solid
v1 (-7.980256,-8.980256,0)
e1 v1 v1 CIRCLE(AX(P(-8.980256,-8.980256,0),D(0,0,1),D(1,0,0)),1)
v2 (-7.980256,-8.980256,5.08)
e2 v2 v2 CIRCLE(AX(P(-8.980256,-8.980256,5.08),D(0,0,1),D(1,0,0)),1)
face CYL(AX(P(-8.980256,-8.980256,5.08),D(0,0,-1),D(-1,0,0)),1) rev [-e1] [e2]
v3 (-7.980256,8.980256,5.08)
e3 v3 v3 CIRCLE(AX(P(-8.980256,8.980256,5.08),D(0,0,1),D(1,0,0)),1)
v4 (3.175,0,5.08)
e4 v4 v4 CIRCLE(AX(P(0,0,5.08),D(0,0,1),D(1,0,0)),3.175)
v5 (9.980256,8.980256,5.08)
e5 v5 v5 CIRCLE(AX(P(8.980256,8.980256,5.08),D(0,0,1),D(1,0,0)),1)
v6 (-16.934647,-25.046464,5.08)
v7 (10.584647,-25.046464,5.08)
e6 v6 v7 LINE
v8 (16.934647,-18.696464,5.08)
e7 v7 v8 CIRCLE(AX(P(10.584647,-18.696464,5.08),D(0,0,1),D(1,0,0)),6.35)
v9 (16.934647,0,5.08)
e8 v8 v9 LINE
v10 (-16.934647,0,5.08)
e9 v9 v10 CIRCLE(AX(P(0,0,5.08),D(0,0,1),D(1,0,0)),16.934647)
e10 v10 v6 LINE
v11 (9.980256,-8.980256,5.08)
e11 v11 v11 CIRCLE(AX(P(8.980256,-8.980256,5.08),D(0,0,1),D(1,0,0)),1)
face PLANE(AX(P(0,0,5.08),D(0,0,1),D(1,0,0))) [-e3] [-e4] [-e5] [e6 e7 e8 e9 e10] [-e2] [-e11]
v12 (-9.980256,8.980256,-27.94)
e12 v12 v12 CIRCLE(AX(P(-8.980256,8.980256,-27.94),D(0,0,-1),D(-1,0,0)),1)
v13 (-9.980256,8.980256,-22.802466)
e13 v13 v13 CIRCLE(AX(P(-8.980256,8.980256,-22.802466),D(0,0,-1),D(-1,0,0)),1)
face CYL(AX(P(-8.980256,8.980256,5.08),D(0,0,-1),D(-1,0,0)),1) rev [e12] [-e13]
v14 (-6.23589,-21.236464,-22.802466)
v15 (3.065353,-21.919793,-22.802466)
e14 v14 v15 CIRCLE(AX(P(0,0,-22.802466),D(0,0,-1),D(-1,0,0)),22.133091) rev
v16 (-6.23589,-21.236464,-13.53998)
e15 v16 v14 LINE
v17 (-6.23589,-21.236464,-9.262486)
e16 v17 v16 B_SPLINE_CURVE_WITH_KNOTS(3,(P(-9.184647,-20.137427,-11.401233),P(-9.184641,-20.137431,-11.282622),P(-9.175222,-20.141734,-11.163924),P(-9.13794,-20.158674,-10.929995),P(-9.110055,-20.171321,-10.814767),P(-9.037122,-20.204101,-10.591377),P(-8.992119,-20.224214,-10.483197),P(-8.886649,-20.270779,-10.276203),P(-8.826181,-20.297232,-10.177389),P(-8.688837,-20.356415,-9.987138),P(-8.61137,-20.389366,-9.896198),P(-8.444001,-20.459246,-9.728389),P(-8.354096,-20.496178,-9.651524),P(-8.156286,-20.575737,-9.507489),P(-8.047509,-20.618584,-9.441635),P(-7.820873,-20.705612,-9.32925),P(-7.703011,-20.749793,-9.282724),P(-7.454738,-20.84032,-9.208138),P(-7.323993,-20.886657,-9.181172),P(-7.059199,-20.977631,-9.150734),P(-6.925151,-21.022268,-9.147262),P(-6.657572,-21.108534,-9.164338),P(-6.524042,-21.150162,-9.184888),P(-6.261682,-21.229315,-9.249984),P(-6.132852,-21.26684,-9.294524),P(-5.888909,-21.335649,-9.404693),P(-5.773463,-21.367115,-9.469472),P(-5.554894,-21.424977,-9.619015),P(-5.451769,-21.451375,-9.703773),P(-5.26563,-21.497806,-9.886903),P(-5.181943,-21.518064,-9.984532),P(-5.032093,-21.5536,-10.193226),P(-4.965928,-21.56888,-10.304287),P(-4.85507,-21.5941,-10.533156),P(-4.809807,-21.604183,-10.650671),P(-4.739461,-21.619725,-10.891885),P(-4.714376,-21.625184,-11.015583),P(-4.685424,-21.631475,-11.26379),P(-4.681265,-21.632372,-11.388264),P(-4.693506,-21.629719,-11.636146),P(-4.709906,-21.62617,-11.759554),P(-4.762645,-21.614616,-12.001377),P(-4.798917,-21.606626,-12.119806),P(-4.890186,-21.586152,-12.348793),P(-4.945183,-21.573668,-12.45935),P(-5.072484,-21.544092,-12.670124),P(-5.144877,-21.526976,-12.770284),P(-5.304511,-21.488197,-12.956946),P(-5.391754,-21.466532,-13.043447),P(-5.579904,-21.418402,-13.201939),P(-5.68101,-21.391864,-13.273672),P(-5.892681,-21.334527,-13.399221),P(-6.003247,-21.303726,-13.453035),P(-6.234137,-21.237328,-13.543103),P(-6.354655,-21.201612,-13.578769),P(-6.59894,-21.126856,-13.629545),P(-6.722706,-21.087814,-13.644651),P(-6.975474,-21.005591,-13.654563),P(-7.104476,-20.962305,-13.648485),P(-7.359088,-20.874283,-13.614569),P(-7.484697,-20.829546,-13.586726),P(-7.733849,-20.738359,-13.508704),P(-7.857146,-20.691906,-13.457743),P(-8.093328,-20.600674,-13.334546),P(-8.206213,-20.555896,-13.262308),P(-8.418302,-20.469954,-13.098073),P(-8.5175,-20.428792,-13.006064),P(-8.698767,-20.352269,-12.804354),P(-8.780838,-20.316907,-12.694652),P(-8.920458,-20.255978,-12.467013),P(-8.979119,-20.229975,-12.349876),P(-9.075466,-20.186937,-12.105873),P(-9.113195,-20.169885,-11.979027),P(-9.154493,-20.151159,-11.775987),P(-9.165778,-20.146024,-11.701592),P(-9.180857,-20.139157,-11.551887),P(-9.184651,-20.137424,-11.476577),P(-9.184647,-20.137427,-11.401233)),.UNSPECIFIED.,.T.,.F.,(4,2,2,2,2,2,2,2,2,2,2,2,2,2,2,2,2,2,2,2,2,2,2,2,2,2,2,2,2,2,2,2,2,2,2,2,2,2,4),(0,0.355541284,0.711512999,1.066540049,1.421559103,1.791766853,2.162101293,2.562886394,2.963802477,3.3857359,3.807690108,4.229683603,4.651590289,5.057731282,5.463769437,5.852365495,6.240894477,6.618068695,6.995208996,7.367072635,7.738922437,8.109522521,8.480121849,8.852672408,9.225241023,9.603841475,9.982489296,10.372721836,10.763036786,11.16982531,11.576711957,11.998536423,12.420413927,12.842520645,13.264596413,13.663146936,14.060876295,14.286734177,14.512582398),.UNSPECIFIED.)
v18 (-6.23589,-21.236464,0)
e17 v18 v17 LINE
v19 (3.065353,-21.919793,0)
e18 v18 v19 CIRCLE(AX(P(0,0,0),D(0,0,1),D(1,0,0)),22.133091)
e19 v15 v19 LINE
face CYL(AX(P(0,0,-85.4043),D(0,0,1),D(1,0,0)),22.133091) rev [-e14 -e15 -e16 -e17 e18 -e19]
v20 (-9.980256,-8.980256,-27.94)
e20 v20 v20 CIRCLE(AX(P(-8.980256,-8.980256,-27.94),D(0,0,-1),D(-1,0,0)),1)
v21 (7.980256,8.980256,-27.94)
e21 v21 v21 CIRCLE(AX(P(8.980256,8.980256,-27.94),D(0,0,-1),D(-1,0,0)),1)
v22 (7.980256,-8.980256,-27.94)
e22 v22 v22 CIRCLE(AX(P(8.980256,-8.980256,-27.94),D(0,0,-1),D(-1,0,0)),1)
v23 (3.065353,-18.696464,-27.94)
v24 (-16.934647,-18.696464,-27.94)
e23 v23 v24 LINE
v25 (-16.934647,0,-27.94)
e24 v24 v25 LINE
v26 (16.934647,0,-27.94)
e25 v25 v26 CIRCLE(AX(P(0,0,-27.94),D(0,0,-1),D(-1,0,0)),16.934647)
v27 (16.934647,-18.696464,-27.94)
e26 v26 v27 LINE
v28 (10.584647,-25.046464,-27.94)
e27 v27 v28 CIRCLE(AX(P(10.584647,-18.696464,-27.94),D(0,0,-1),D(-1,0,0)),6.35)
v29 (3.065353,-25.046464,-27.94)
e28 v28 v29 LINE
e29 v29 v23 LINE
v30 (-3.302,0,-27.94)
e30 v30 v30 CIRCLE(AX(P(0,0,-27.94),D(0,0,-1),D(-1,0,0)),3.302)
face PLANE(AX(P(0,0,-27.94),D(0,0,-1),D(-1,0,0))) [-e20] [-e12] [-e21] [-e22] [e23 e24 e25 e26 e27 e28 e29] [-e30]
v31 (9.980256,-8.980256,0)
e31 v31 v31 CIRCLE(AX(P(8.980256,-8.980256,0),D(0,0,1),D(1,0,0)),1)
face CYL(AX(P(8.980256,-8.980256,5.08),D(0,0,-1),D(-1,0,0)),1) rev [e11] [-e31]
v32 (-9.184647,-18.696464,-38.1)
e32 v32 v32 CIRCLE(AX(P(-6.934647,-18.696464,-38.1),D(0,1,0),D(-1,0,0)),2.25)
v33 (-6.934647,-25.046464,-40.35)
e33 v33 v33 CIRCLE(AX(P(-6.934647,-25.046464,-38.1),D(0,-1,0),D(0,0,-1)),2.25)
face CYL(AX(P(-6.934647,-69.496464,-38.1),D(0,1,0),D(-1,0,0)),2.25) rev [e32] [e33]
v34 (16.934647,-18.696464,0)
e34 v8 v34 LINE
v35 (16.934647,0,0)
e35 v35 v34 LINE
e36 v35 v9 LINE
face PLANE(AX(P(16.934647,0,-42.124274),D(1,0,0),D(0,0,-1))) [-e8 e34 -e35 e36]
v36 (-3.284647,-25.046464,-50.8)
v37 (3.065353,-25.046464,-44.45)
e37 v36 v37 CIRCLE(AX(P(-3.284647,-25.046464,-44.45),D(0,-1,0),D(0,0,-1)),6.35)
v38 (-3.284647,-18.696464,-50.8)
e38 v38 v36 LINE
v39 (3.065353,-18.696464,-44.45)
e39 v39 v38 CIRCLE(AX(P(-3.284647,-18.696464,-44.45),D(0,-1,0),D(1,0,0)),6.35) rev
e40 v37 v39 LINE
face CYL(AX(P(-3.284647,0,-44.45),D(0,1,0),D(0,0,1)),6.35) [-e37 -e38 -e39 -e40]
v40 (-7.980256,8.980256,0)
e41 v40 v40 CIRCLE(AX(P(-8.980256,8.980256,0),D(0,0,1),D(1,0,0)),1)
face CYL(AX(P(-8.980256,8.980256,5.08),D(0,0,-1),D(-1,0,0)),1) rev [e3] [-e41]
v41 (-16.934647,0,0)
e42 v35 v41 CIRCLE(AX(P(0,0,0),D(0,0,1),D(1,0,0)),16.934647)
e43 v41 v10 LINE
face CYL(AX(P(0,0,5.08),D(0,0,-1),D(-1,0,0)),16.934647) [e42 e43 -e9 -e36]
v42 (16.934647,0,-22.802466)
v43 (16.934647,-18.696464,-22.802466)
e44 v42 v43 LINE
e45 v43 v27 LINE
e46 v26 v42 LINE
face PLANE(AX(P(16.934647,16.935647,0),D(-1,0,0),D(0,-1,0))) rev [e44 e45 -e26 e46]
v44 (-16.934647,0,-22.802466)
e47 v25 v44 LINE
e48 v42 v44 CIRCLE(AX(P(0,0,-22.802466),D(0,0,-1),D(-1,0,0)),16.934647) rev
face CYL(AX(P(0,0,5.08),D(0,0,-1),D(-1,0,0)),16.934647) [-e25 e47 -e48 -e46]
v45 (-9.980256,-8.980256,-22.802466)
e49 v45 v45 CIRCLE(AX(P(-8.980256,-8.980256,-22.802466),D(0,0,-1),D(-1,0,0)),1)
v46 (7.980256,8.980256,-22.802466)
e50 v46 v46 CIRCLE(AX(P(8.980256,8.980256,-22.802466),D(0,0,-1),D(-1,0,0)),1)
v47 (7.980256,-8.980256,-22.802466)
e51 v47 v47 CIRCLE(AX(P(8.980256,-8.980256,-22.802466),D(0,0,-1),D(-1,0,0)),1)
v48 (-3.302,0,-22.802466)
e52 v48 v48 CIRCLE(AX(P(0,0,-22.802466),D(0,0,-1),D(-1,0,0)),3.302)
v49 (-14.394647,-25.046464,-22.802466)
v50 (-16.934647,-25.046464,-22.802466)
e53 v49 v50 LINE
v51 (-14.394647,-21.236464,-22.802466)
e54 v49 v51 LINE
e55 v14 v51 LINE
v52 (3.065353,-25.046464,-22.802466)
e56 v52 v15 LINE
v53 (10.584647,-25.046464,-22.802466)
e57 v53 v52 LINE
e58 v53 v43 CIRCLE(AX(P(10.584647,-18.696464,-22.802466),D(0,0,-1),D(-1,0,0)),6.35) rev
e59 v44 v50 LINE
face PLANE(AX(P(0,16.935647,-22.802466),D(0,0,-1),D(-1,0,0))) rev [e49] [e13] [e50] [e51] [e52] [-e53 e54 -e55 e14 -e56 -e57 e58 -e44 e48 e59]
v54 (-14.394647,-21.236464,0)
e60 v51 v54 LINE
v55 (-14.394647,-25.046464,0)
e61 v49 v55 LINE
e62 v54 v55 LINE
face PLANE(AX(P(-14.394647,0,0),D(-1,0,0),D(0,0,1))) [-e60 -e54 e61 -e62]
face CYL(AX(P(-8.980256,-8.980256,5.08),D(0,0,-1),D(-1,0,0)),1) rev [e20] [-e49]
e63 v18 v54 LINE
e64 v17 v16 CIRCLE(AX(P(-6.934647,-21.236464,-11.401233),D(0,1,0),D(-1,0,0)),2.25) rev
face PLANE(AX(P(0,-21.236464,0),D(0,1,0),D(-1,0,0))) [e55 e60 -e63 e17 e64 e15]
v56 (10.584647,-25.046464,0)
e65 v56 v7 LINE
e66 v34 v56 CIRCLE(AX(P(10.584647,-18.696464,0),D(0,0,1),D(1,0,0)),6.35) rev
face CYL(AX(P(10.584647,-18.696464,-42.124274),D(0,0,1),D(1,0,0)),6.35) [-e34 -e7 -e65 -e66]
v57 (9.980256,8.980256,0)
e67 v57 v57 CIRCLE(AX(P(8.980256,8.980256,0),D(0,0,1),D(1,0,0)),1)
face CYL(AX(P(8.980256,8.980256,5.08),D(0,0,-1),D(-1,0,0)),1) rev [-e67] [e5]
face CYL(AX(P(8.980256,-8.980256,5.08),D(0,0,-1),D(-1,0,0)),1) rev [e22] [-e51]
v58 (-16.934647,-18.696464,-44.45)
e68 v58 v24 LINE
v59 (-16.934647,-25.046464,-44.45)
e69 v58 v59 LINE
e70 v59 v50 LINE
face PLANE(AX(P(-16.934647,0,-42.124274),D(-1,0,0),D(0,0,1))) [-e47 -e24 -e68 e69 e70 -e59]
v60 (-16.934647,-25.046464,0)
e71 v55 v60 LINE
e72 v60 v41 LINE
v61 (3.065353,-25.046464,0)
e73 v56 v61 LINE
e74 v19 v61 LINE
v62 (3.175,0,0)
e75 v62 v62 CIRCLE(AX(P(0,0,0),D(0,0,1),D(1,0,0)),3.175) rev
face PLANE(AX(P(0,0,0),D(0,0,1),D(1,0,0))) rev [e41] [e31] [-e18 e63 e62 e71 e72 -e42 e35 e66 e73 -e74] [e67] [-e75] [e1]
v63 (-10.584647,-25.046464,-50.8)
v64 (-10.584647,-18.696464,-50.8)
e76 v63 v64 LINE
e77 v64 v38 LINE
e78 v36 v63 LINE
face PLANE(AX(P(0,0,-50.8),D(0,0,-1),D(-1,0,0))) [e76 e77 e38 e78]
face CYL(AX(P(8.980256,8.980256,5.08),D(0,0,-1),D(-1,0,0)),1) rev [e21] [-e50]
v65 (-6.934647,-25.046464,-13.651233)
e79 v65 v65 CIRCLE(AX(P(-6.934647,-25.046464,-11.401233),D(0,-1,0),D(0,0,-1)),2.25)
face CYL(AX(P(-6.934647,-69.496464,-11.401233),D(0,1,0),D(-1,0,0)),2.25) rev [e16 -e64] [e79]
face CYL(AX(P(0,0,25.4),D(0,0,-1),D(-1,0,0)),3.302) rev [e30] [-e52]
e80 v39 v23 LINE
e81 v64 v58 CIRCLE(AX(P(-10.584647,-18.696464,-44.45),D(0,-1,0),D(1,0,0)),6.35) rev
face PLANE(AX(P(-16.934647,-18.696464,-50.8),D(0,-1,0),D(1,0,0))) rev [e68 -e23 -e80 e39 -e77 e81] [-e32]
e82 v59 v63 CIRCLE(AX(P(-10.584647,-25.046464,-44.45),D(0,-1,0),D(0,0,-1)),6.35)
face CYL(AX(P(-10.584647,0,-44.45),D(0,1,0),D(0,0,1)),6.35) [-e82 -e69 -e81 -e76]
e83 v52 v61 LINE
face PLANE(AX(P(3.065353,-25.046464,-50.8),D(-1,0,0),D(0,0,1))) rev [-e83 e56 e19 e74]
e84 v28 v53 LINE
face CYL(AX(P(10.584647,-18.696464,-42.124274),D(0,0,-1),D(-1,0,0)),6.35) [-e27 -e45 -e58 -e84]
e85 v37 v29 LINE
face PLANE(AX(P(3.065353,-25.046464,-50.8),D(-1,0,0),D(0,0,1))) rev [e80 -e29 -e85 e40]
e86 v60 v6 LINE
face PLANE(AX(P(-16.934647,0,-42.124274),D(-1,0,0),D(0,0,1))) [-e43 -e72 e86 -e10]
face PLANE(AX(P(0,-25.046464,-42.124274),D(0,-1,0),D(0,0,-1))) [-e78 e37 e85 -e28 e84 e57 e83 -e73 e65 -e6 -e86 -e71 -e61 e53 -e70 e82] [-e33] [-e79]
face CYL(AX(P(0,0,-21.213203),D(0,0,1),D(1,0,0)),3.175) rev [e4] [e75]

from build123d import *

# Parameters (mm, degrees)
SKETCH1_R                      = 16.934647101
SKETCH1_R_2                    = 1
SKETCH1_R_3                    = 7.5
BOSS_EXTRUDE1_DEPTH            = 5.08
BOSS_EXTRUDE2_START            = -5.08
BOSS_EXTRUDE2_DEPTH            = 5.08
SKETCH3_W                      = 20
SKETCH3_H                      = 6.35
BOSS_EXTRUDE3_DEPTH            = 50.8
BOSS_EXTRUDE4_START            = -25.4
BOSS_EXTRUDE4_DEPTH            = 2.597534174
SKETCH5_R                      = 3.302
CUT_EXTRUDE1_DEPTH             = 50.8
SKETCH6_W                      = 13.869294202
SKETCH6_H                      = 2.597534174
BOSS_EXTRUDE5_DEPTH            = 6.35
CUT_EXTRUDE2_DEPTH             = 50.8
BOSS_EXTRUDE7_START            = 2.54
SKETCH8_R                      = 3.302
BOSS_EXTRUDE7_DEPTH            = 2.54
CUT_EXTRUDE3_REACH             = 55.758
SKETCH10_R                     = 22.133090672
CUT_EXTRUDE3_DIRECTION_2_REACH = 55.758
FILLET1_R                      = 6.35
FILLET3_R                      = 6.35
SKETCH11_R                     = 1
CUT_EXTRUDE4_DEPTH             = 45.770838885
BOSS_EXTRUDE8_START            = -5.08
SKETCH12_R                     = 7.5
SKETCH12_R_2                   = 3.175
BOSS_EXTRUDE8_DEPTH            = 5.08
SKETCH13_W                     = 14.910856388
SKETCH13_H                     = 22.802465826
SKETCH13_W_2                   = 5.089143612
CUT_EXTRUDE5_DEPTH             = 2.54
SKETCH14_W                     = 22.802465826
SKETCH14_H                     = 1.813273425
SKETCH14_H_2                   = 0.683329188
SKETCH14_H_3                   = 3.126670812
CUT_EXTRUDE6_DEPTH             = 2.54


# Read off the part's stored shape, not the designer's step: Boss-Extrude4
with BuildPart() as part:
    # Sketch1 → Boss-Extrude1 (new body)
    with BuildSketch(Plane.XY):
        Circle(SKETCH1_R)
        with Locations((8.980256121, 8.980256121)):
            Circle(SKETCH1_R_2, mode=Mode.SUBTRACT)
        with Locations((8.980256121, -8.980256121)):
            Circle(SKETCH1_R_2, mode=Mode.SUBTRACT)
        with Locations((-8.980256121, -8.980256121)):
            Circle(SKETCH1_R_2, mode=Mode.SUBTRACT)
        with Locations((-8.980256121, 8.980256121)):
            Circle(SKETCH1_R_2, mode=Mode.SUBTRACT)
        Circle(SKETCH1_R_3, mode=Mode.SUBTRACT)
    extrude(amount=BOSS_EXTRUDE1_DEPTH)

    # Sketch2 → Boss-Extrude2 (add)
    with BuildSketch(Plane.XY.offset(5.08).offset(BOSS_EXTRUDE2_START)):
        with BuildLine():
            ThreePointArc((16.934647101, 0), (0, -16.934647101), (-16.934647101, 0))
            Line((-16.934647101, 0), (-16.934647101, -25.046463564))
            Line((-16.934647101, -25.046463564), (16.934647101, -25.046463564))
            Line((16.934647101, -25.046463564), (16.934647101, 0))
        make_face()
    extrude(amount=BOSS_EXTRUDE2_DEPTH)

    # Sketch3 → Boss-Extrude3 (add)
    with BuildSketch(Plane(origin=(0, 0, 0), x_dir=(-1, 0, 0), z_dir=(0, 0, -1))):
        with Locations((6.934647101, -21.871463564)):
            Rectangle(SKETCH3_W, SKETCH3_H)
    extrude(amount=BOSS_EXTRUDE3_DEPTH)

    # Boss-Extrude4 outline → Boss-Extrude4 (add)
    with BuildSketch(Plane.XY.offset(BOSS_EXTRUDE4_START)):
        with BuildLine():
            ThreePointArc((16.934647101, 0), (0, 16.934647101), (-16.934647101, 0))
            Line((-16.934647101, 0), (-16.934647101, -18.696463564))
            Line((-16.934647101, -18.696463564), (16.934647101, -18.696463564))
            Line((16.934647101, -18.696463564), (16.934647101, 0))
        make_face()
    extrude(amount=BOSS_EXTRUDE4_DEPTH)

    # Sketch5 → Cut-Extrude1 (cut)
    with BuildSketch(Plane(origin=(0, 0, -25.4), x_dir=(-1, 0, 0), z_dir=(0, 0, -1))):
        Circle(SKETCH5_R)
    extrude(amount=-CUT_EXTRUDE1_DEPTH, mode=Mode.SUBTRACT)

    # Sketch6 → Boss-Extrude5 (add)
    with BuildSketch(Plane.XZ.offset(18.696463564)):
        with Locations((10, -24.101232913)):
            Rectangle(SKETCH6_W, SKETCH6_H)
    extrude(amount=BOSS_EXTRUDE5_DEPTH)

    # Sketch7 → Cut-Extrude2 (cut)
    with BuildSketch(Plane(origin=(0, -18.696463564, 0), x_dir=(1, 0, 0), z_dir=(0, 1, 0))):
        with BuildLine():
            ThreePointArc((-4.684647101, 11.401232913), (-4.885171568, 12.329753263), (-5.451002692, 13.092770459))
            Line((-5.451002692, 13.092770459), (-8.418291509, 9.709695367))
            ThreePointArc((-8.418291509, 9.709695367), (-6.00612675, 9.35175738), (-4.684647101, 11.401232913))
        make_face()
        with BuildLine():
            Line((-8.418291509, 9.709695367), (-5.451002692, 13.092770459))
            ThreePointArc((-5.451002692, 13.092770459), (-8.626184647, 12.884877321), (-8.418291509, 9.709695367))
        make_face()
        with BuildLine():
            ThreePointArc((-5.542705151, 39.867766276), (-8.702413377, 39.49194195), (-8.32658905, 36.332233724))
            Line((-8.32658905, 36.332233724), (-5.542705151, 39.867766276))
        make_face()
        with BuildLine():
            Line((-5.542705151, 39.867766276), (-8.32658905, 36.332233724))
            ThreePointArc((-8.32658905, 36.332233724), (-5.952142492, 36.075849637), (-4.684647101, 38.1))
            ThreePointArc((-4.684647101, 38.1), (-4.910496737, 39.082504609), (-5.542705151, 39.867766276))
        make_face()
    extrude(amount=-CUT_EXTRUDE2_DEPTH, mode=Mode.SUBTRACT)

    # Sketch8 → Boss-Extrude7 (add)
    with BuildSketch(Plane(origin=(0, 0, -25.4), x_dir=(-1, 0, 0), z_dir=(0, 0, -1)).offset(BOSS_EXTRUDE7_START)):
        with BuildLine():
            Line((-16.934647101, 0), (-16.934647101, -25.046463564))
            Line((-16.934647101, -25.046463564), (-3.065352899, -25.046463564))
            Line((-3.065352899, -25.046463564), (-3.065352899, -18.696463564))
            Line((-3.065352899, -18.696463564), (16.934647101, -18.696463564))
            Line((16.934647101, -18.696463564), (16.934647101, 0))
            ThreePointArc((16.934647101, 0), (0, 16.934647101), (-16.934647101, 0))
        make_face()
        Circle(SKETCH8_R, mode=Mode.SUBTRACT)
    extrude(amount=-BOSS_EXTRUDE7_DEPTH)

    # Cut-Extrude3: up to this face of the body (flat: up to its plane)
    cut_extrude3_end = Plane(part.part.faces().sort_by_distance((0.774222072, -4.051019625, -22.802465826))[0])
    # Sketch10 → Cut-Extrude3 (cut, up to the picked face)
    with BuildSketch(Plane.XY.offset(-6.35), mode=Mode.PRIVATE) as cut_extrude3_sk1:
        Circle(SKETCH10_R)
    cut_extrude3_tool1 = split(extrude(cut_extrude3_sk1.sketch, amount=-CUT_EXTRUDE3_REACH, mode=Mode.PRIVATE), bisect_by=cut_extrude3_end, keep=Keep.BOTH, mode=Mode.PRIVATE)
    add(cut_extrude3_tool1.solids().sort_by(Axis((0, 0, -6.35), (0, 0, -1)))[0], mode=Mode.SUBTRACT)

    # Cut-Extrude3 direction 2: up to this face of the body (flat: up to its plane)
    cut_extrude3_direction_2_end = Plane(part.part.faces().sort_by_distance((16.395245326, -12.523231782, 0))[0])
    # Sketch10 → Cut-Extrude3 direction 2 (cut, up to the picked face)
    with BuildSketch(Plane.XY.offset(-6.35), mode=Mode.PRIVATE) as cut_extrude3_direction_2_sk1:
        Circle(SKETCH10_R)
    cut_extrude3_direction_2_tool1 = split(extrude(cut_extrude3_direction_2_sk1.sketch, amount=CUT_EXTRUDE3_DIRECTION_2_REACH, mode=Mode.PRIVATE), bisect_by=cut_extrude3_direction_2_end, keep=Keep.BOTH, mode=Mode.PRIVATE)
    add(cut_extrude3_direction_2_tool1.solids().sort_by(Axis((0, 0, -6.35), (0, 0, 1)))[0], mode=Mode.SUBTRACT)

    # Fillet1
    fillet1_edges = [part.edges().sort_by_distance(p)[0] for p in [
        (16.934647101, -25.046463564, 2.54),
        (16.934647101, -25.046463564, -25.371232913),
    ]]
    fillet(fillet1_edges, radius=FILLET1_R)

    # Fillet3
    fillet3_edges = [part.edges().sort_by_distance(p)[0] for p in [
        (-16.934647101, -21.871463564, -50.8),
        (3.065352899, -21.871463564, -50.8),
    ]]
    fillet(fillet3_edges, radius=FILLET3_R)

    # Sketch11 → Cut-Extrude4 (cut, through all)
    with BuildSketch(Plane(origin=(0, 0, -27.94), x_dir=(-1, 0, 0), z_dir=(0, 0, -1))):
        with Locations(Location((-8.980256121, -8.980256121, 0), (0, 0, 180))):
            Circle(SKETCH11_R)
        with Locations(Location((-8.980256121, 8.980256121, 0), (0, 0, 180))):
            Circle(SKETCH11_R)
        with Locations(Location((8.980256121, -8.980256121, 0), (0, 0, 180))):
            Circle(SKETCH11_R)
        with Locations(Location((8.980256121, 8.980256121, 0), (0, 0, 180))):
            Circle(SKETCH11_R)
    extrude(amount=-CUT_EXTRUDE4_DEPTH, mode=Mode.SUBTRACT)

    # Sketch12 → Boss-Extrude8 (add)
    with BuildSketch(Plane.XY.offset(5.08).offset(BOSS_EXTRUDE8_START)):
        Circle(SKETCH12_R)
        Circle(SKETCH12_R_2, mode=Mode.SUBTRACT)
    extrude(amount=BOSS_EXTRUDE8_DEPTH)

    # Sketch13 → Cut-Extrude5 (cut)
    with BuildSketch(Plane(origin=(0, -18.696463564, 0), x_dir=(1, 0, 0), z_dir=(0, 1, 0))):
        with Locations((-4.390075295, 11.401232913)):
            Rectangle(SKETCH13_W, SKETCH13_H)
        with Locations((-14.390075295, 11.401232913)):
            Rectangle(SKETCH13_W_2, SKETCH13_H)
    extrude(amount=-CUT_EXTRUDE5_DEPTH, mode=Mode.SUBTRACT)

    # Sketch14 → Cut-Extrude6 (cut)
    with BuildSketch(Plane.ZY.offset(16.934647101)):
        with Locations((-11.401232913, -20.329826852)):
            Rectangle(SKETCH14_W, SKETCH14_H)
        with Locations((-11.401232913, -21.578128158)):
            Rectangle(SKETCH14_W, SKETCH14_H_2)
        with Locations((-11.401232913, -23.483128158)):
            Rectangle(SKETCH14_W, SKETCH14_H_3)
    extrude(amount=-CUT_EXTRUDE6_DEPTH, mode=Mode.SUBTRACT)


solid = part.part
